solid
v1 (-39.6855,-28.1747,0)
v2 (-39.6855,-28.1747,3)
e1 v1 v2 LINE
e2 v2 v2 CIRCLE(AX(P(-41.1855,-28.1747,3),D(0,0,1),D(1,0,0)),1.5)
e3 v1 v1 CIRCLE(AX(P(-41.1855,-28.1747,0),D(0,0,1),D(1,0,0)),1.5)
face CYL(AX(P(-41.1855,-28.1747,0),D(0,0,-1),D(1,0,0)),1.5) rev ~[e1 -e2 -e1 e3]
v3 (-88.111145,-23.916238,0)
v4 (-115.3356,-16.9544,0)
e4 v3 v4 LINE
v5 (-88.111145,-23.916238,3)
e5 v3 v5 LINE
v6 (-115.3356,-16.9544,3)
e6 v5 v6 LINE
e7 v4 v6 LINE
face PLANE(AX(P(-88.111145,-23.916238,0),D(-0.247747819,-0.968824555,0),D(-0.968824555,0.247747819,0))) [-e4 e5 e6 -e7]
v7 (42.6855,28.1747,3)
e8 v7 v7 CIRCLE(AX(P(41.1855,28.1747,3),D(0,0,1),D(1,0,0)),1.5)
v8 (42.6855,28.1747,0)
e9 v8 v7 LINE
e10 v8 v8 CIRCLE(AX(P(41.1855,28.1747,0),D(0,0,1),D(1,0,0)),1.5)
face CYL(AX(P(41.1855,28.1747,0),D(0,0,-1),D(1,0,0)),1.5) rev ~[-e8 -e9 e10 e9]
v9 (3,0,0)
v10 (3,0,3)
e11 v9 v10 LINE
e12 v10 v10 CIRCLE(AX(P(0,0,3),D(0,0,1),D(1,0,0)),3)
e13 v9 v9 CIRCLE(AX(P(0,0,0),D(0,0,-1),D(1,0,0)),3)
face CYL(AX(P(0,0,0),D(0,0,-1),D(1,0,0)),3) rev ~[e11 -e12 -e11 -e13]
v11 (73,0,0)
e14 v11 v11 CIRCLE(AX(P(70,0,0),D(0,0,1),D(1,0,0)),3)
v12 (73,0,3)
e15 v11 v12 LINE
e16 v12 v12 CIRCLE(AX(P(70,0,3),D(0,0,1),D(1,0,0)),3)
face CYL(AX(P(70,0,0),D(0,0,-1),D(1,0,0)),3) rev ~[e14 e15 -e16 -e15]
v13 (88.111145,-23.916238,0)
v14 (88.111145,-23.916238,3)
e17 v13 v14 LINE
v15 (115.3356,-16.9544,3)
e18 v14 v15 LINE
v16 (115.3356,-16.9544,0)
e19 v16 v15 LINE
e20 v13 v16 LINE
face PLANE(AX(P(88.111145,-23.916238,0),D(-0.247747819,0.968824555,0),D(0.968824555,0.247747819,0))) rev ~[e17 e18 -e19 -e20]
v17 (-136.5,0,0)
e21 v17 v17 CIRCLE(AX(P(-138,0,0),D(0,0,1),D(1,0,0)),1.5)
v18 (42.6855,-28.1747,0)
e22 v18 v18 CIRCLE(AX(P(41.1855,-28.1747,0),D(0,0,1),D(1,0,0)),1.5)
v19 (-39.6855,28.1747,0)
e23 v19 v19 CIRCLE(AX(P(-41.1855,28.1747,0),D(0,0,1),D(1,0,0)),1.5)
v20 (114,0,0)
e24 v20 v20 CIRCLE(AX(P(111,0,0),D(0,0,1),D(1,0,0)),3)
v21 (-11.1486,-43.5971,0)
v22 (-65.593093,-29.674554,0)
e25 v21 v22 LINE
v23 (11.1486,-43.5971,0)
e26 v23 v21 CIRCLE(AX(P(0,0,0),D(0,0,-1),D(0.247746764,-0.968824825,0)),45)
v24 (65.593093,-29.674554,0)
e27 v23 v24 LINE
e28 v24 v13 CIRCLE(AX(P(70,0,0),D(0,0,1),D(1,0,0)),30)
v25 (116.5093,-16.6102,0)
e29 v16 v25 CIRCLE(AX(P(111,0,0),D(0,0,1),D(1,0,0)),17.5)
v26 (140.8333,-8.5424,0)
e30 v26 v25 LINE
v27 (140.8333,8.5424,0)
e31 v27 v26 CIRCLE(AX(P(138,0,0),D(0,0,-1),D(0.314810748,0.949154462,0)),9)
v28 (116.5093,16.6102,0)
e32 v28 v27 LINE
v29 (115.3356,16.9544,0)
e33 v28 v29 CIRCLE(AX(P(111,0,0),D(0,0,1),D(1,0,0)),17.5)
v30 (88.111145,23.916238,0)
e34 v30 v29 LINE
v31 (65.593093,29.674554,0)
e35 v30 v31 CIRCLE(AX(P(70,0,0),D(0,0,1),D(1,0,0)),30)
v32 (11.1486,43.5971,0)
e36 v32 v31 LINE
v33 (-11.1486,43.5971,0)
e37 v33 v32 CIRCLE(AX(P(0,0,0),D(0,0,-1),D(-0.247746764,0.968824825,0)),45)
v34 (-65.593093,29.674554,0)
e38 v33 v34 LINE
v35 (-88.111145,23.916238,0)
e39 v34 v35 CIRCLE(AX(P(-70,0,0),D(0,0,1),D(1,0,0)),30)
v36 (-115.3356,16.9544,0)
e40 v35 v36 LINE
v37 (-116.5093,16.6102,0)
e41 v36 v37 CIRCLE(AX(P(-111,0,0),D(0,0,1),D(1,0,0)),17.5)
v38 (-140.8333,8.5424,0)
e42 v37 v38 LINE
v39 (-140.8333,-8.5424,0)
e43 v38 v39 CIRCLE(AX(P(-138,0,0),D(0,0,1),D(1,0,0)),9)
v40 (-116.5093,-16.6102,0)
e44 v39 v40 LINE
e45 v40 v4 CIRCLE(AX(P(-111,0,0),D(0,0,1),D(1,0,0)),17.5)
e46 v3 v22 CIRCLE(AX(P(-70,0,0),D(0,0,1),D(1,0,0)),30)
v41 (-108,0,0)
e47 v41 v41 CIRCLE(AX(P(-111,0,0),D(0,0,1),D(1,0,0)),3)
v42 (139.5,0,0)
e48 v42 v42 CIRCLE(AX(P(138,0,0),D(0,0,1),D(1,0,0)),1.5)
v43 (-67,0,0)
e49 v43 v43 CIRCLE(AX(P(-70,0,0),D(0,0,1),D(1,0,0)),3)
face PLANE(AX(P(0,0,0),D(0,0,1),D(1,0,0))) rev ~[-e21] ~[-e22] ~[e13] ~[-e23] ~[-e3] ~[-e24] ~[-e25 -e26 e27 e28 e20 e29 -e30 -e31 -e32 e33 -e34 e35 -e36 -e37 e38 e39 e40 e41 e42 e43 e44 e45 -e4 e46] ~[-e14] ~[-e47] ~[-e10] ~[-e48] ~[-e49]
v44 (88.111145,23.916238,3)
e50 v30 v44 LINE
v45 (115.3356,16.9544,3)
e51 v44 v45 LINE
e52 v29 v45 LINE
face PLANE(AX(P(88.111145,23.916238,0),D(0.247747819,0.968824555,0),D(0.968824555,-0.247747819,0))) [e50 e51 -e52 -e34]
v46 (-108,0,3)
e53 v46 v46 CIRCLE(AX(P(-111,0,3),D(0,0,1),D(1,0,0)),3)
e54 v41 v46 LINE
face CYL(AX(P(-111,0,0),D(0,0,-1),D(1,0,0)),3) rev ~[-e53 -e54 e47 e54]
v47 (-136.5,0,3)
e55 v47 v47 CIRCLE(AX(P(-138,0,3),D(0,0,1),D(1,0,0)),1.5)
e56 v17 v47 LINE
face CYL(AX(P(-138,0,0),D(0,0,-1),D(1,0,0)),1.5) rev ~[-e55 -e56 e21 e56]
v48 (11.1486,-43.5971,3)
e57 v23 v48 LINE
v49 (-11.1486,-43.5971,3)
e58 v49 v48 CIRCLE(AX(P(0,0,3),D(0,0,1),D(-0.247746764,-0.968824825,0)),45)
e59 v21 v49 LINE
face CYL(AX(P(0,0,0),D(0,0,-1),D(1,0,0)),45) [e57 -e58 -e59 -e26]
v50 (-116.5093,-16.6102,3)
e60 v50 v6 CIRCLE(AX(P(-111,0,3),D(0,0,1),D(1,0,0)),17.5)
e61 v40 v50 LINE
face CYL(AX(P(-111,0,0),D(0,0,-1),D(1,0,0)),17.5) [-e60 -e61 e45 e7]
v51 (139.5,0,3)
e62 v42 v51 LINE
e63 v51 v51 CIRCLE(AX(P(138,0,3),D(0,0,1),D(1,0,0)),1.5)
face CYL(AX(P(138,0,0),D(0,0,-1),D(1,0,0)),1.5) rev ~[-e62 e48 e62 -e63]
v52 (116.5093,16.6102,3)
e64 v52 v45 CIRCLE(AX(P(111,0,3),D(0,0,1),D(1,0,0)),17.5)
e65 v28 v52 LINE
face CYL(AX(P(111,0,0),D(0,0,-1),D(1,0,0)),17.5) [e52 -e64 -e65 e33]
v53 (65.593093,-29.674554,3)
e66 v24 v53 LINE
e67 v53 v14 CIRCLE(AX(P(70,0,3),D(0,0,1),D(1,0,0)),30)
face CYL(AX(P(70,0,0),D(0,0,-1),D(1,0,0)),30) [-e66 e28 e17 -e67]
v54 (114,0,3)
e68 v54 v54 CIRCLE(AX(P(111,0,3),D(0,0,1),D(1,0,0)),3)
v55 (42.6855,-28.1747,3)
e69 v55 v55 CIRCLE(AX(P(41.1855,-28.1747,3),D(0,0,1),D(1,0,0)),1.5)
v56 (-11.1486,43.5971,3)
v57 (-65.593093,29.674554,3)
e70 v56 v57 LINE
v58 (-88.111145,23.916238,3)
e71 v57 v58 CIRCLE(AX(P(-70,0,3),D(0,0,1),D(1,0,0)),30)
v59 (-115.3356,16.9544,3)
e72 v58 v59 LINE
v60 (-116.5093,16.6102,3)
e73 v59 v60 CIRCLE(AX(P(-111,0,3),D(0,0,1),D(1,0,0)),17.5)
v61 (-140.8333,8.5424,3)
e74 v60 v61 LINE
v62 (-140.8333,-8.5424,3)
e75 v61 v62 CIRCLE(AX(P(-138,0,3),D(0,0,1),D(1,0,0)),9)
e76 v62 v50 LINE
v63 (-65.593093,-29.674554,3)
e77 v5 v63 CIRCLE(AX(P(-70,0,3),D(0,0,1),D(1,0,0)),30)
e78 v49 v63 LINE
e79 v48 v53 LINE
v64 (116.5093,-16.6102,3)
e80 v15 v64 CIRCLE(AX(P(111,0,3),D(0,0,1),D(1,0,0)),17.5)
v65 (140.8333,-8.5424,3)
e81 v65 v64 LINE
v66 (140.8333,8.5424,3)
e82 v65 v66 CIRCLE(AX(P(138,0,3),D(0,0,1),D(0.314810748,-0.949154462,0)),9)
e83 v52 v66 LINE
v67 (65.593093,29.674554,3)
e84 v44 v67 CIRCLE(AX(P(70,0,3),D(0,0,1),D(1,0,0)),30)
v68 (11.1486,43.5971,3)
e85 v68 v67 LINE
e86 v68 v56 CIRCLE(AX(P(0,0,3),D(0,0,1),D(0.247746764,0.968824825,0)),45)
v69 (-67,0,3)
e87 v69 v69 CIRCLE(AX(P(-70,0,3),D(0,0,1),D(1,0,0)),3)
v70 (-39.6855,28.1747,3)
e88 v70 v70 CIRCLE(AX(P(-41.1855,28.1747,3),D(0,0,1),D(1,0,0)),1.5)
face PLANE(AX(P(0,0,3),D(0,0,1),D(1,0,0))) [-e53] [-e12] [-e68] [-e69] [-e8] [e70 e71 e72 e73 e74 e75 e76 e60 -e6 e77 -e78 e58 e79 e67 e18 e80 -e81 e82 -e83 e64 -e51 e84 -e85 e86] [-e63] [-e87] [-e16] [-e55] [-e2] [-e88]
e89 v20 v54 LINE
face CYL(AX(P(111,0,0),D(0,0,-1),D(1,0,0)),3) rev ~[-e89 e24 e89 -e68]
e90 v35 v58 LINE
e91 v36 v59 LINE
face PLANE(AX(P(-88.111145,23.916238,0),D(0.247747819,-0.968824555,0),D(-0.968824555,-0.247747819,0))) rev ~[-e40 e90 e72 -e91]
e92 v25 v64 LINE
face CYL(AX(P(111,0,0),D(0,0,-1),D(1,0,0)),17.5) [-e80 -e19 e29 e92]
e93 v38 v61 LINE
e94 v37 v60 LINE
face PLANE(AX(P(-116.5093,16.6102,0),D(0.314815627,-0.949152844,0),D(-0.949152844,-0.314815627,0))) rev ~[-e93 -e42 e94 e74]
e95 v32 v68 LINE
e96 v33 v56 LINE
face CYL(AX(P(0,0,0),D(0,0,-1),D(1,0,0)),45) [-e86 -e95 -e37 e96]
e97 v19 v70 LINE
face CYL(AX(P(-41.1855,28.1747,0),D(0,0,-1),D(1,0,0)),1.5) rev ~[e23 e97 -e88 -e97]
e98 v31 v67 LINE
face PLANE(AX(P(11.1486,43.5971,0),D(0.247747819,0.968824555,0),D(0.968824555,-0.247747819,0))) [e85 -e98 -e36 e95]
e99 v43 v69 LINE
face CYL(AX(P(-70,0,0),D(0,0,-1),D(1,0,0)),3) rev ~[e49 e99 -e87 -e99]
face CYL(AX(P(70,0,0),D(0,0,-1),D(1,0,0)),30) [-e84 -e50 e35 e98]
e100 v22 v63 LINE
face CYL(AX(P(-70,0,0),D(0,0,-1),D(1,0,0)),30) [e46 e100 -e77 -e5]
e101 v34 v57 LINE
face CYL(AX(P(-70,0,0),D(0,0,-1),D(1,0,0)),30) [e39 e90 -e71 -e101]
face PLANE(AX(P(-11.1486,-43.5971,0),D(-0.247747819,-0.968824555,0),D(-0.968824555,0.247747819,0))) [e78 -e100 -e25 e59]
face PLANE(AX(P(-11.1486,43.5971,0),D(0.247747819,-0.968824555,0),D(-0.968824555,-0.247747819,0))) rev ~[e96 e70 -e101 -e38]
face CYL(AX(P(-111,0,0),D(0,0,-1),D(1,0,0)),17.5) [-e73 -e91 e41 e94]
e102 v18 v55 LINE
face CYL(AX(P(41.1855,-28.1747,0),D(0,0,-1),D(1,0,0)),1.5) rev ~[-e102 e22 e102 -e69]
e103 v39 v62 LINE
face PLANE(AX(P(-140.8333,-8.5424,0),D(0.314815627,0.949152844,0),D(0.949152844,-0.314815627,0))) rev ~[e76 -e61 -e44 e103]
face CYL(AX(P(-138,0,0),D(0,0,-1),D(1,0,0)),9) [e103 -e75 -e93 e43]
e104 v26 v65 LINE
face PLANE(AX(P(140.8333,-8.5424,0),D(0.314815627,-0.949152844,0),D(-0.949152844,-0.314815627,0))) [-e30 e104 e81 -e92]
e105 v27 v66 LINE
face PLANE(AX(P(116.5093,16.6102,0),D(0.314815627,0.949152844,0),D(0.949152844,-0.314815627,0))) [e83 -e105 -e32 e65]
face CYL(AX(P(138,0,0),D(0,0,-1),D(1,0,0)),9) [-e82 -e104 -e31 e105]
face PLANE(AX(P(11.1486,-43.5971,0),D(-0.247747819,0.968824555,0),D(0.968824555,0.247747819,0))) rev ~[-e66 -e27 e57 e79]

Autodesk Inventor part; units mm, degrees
ref_plane "YZ Plane" through (0, 0, 0) normal (1, 0, 0) x (0, 1, 0)
ref_plane "XZ Plane" through (0, 0, 0) normal (0, 1, 0) x (-1, 0, 0)
ref_plane "XY Plane" through (0, 0, 0) normal (0, 0, 1) x (1, 0, 0)
sketch "Sketch1" plane through (0, 0, 0) normal (0, 0, 1) x (1, 0, 0)
  circle A0 centre (0, 0) radius 45
  circle A1 centre (70, 0) radius 30
  circle A2 centre (111, 0) radius 17.5
  circle A3 centre (138, 0) radius 9
  circle A4 centre (-70, 0) radius 30
  circle A5 centre (-111, 0) radius 17.5
  circle A6 centre (-138, 0) radius 9
  line L0 (-11.1486, 43.5971) -> (-115.3356, 16.9544)
  line L1 (11.1486, 43.5971) -> (115.3356, 16.9544)
  line L2 (-116.5093, 16.6102) -> (-140.8333, 8.5424)
  line L3 (116.5093, 16.6102) -> (140.8333, 8.5424)
  line L4 (-11.1486, -43.5971) -> (-115.3356, -16.9544)
  line L5 (11.1486, -43.5971) -> (115.3356, -16.9544)
  line L6 (140.8333, -8.5424) -> (116.5093, -16.6102)
  line L7 (-140.8333, -8.5424) -> (-116.5093, -16.6102)
  circle A7 centre (-138, 0) radius 1.5
  circle A8 centre (-111, 0) radius 3
  circle A9 centre (-70, 0) radius 3
  circle A10 centre (0, 0) radius 3
  circle A11 centre (70, 0) radius 3
  circle A12 centre (111, 0) radius 3
  circle A13 centre (138, 0) radius 1.5
  line L8 (-123.0921, -97.5699) -> (-152.3126, 20.9991) construction
  line L9 (-152.3126, 20.9991) -> (130.841, 90.7804) construction
  line L10 (130.841, 90.7804) -> (160.0615, -27.7887) construction
  line L11 (160.0615, -27.7887) -> (-123.0921, -97.5699) construction
  circle A14 centre (-41.1855, -28.1747) radius 1.5
  circle A15 centre (-41.1855, 28.1747) radius 1.5
  circle A16 centre (41.1855, 28.1747) radius 1.5
  circle A17 centre (41.1855, -28.1747) radius 1.5
  line L12 (0, 45) -> (0, -45)
  line L13 (-37.7402, 24.5088) -> (37.7402, -24.5088)
  line L14 (-37.7402, -24.5088) -> (37.7402, 24.5088)
  line L15 (-45, 0) -> (45, 0)
  point P0 (-88.1111, 23.9163)
  point P1 (-88.1111, -23.9163)
  point P2 (-65.5931, -29.6746)
  point P3 (65.5931, -29.6746)
  point P4 (88.1111, -23.9163)
  point P5 (88.1111, 23.9163)
  point P6 (65.5931, 29.6746)
  point P7 (-65.5931, 29.6746)
  point P8 (0, 0)
  dimension "d0" = 90
  dimension "d1" = 60
  dimension "d2" = 70
  dimension "d3" = 35
  dimension "d4" = 41
  dimension "d5" = 18
  dimension "d6" = 27
  dimension "d7" = 0
  dimension "d8" = 0
  dimension "d9" = 0
  dimension "d10" = 60
  dimension "d11" = 35
  dimension "d12" = 41
  dimension "d13" = 18
  dimension "d16" = 70
  dimension "d17" = 0
  dimension "d18" = 0
  dimension "d19" = 0
  dimension "d20" = 27
  dimension "d23" = 6
  dimension "d24" = 6
  dimension "d25" = 6
  dimension "d26" = 3
  dimension "d27" = 6
  dimension "d28" = 6
  dimension "d29" = 3
  dimension "d109" = 0.5
  dimension "d121" = 7.5
  dimension "d133" = 3
  dimension "d138" = 8.8
  dimension "d139" = 3.4005
  dimension "d140" = 3
  dimension "d141" = 3
  dimension "d142" = 3
  dimension "d143" = 7.5
  dimension "d145" = 8.8
  dimension "d146" = 7.5
  dimension "d148" = 8.8
  dimension "d151" = 8.8
  dimension "d152" = 3.4005
  dimension "d153" = 3.4005
  dimension "d155" = 7.5
  dimension "d156" = 3.4005
  dimension "d157" = 57
  dimension "d159" = 57
extrude "Extrusion1" add sketch "Sketch1" along normal blind 3 contours L14 A10 L12 A0 | A0 L1 A1 | A0 A1 L15 A10 L14 | A1 L1 A2 L5 A0 | A0 L15 A1 | L12 A10 L13 A0 | A1 L1 | A0 A1 L15 | A1 A0 L13 A10 L15 | A0 A4 L0 | L1 A2 A1 | A1 L5 A0 | L13 A0 L12 A10 | A10 L15 A4 A0 L13 | L12 A0 L14 A10 | L14 A0 A4 L15 A10 | L0 A4 | A4 A0 L4 A5 L0 | A2 A1 | A1 A2 | L5 A1 | A0 L4 A4 | L15 A0 A4 | A4 A0 L15 | A4 A5 L0 | A2 L5 A1 | L3 A3 L6 A2 | A5 A4 | A4 A5 | A3 | A4 L4 | A4 L4 A5 | A5 L7 A6 L2 | A6
equation "\"BendRadius\" = Thickness"
equation "\"BendReliefWidth\" = Thickness"
equation "\"BendReliefDepth\" = 0.5 * Thickness"
equation "\"CornerReliefSize\" = 4 * Thickness"
equation "\"MinimumRemnant\" = 2 * Thickness"
equation "\"TransitionRadius\" = BendRadius"
equation "\"JacobiRadiusSize\" = BendRadius"
equation "\"GapSize\" = Thickness"
equation "\"Thickness\" = 3"
properties part number "frame2" material "PMMA Plastic"
